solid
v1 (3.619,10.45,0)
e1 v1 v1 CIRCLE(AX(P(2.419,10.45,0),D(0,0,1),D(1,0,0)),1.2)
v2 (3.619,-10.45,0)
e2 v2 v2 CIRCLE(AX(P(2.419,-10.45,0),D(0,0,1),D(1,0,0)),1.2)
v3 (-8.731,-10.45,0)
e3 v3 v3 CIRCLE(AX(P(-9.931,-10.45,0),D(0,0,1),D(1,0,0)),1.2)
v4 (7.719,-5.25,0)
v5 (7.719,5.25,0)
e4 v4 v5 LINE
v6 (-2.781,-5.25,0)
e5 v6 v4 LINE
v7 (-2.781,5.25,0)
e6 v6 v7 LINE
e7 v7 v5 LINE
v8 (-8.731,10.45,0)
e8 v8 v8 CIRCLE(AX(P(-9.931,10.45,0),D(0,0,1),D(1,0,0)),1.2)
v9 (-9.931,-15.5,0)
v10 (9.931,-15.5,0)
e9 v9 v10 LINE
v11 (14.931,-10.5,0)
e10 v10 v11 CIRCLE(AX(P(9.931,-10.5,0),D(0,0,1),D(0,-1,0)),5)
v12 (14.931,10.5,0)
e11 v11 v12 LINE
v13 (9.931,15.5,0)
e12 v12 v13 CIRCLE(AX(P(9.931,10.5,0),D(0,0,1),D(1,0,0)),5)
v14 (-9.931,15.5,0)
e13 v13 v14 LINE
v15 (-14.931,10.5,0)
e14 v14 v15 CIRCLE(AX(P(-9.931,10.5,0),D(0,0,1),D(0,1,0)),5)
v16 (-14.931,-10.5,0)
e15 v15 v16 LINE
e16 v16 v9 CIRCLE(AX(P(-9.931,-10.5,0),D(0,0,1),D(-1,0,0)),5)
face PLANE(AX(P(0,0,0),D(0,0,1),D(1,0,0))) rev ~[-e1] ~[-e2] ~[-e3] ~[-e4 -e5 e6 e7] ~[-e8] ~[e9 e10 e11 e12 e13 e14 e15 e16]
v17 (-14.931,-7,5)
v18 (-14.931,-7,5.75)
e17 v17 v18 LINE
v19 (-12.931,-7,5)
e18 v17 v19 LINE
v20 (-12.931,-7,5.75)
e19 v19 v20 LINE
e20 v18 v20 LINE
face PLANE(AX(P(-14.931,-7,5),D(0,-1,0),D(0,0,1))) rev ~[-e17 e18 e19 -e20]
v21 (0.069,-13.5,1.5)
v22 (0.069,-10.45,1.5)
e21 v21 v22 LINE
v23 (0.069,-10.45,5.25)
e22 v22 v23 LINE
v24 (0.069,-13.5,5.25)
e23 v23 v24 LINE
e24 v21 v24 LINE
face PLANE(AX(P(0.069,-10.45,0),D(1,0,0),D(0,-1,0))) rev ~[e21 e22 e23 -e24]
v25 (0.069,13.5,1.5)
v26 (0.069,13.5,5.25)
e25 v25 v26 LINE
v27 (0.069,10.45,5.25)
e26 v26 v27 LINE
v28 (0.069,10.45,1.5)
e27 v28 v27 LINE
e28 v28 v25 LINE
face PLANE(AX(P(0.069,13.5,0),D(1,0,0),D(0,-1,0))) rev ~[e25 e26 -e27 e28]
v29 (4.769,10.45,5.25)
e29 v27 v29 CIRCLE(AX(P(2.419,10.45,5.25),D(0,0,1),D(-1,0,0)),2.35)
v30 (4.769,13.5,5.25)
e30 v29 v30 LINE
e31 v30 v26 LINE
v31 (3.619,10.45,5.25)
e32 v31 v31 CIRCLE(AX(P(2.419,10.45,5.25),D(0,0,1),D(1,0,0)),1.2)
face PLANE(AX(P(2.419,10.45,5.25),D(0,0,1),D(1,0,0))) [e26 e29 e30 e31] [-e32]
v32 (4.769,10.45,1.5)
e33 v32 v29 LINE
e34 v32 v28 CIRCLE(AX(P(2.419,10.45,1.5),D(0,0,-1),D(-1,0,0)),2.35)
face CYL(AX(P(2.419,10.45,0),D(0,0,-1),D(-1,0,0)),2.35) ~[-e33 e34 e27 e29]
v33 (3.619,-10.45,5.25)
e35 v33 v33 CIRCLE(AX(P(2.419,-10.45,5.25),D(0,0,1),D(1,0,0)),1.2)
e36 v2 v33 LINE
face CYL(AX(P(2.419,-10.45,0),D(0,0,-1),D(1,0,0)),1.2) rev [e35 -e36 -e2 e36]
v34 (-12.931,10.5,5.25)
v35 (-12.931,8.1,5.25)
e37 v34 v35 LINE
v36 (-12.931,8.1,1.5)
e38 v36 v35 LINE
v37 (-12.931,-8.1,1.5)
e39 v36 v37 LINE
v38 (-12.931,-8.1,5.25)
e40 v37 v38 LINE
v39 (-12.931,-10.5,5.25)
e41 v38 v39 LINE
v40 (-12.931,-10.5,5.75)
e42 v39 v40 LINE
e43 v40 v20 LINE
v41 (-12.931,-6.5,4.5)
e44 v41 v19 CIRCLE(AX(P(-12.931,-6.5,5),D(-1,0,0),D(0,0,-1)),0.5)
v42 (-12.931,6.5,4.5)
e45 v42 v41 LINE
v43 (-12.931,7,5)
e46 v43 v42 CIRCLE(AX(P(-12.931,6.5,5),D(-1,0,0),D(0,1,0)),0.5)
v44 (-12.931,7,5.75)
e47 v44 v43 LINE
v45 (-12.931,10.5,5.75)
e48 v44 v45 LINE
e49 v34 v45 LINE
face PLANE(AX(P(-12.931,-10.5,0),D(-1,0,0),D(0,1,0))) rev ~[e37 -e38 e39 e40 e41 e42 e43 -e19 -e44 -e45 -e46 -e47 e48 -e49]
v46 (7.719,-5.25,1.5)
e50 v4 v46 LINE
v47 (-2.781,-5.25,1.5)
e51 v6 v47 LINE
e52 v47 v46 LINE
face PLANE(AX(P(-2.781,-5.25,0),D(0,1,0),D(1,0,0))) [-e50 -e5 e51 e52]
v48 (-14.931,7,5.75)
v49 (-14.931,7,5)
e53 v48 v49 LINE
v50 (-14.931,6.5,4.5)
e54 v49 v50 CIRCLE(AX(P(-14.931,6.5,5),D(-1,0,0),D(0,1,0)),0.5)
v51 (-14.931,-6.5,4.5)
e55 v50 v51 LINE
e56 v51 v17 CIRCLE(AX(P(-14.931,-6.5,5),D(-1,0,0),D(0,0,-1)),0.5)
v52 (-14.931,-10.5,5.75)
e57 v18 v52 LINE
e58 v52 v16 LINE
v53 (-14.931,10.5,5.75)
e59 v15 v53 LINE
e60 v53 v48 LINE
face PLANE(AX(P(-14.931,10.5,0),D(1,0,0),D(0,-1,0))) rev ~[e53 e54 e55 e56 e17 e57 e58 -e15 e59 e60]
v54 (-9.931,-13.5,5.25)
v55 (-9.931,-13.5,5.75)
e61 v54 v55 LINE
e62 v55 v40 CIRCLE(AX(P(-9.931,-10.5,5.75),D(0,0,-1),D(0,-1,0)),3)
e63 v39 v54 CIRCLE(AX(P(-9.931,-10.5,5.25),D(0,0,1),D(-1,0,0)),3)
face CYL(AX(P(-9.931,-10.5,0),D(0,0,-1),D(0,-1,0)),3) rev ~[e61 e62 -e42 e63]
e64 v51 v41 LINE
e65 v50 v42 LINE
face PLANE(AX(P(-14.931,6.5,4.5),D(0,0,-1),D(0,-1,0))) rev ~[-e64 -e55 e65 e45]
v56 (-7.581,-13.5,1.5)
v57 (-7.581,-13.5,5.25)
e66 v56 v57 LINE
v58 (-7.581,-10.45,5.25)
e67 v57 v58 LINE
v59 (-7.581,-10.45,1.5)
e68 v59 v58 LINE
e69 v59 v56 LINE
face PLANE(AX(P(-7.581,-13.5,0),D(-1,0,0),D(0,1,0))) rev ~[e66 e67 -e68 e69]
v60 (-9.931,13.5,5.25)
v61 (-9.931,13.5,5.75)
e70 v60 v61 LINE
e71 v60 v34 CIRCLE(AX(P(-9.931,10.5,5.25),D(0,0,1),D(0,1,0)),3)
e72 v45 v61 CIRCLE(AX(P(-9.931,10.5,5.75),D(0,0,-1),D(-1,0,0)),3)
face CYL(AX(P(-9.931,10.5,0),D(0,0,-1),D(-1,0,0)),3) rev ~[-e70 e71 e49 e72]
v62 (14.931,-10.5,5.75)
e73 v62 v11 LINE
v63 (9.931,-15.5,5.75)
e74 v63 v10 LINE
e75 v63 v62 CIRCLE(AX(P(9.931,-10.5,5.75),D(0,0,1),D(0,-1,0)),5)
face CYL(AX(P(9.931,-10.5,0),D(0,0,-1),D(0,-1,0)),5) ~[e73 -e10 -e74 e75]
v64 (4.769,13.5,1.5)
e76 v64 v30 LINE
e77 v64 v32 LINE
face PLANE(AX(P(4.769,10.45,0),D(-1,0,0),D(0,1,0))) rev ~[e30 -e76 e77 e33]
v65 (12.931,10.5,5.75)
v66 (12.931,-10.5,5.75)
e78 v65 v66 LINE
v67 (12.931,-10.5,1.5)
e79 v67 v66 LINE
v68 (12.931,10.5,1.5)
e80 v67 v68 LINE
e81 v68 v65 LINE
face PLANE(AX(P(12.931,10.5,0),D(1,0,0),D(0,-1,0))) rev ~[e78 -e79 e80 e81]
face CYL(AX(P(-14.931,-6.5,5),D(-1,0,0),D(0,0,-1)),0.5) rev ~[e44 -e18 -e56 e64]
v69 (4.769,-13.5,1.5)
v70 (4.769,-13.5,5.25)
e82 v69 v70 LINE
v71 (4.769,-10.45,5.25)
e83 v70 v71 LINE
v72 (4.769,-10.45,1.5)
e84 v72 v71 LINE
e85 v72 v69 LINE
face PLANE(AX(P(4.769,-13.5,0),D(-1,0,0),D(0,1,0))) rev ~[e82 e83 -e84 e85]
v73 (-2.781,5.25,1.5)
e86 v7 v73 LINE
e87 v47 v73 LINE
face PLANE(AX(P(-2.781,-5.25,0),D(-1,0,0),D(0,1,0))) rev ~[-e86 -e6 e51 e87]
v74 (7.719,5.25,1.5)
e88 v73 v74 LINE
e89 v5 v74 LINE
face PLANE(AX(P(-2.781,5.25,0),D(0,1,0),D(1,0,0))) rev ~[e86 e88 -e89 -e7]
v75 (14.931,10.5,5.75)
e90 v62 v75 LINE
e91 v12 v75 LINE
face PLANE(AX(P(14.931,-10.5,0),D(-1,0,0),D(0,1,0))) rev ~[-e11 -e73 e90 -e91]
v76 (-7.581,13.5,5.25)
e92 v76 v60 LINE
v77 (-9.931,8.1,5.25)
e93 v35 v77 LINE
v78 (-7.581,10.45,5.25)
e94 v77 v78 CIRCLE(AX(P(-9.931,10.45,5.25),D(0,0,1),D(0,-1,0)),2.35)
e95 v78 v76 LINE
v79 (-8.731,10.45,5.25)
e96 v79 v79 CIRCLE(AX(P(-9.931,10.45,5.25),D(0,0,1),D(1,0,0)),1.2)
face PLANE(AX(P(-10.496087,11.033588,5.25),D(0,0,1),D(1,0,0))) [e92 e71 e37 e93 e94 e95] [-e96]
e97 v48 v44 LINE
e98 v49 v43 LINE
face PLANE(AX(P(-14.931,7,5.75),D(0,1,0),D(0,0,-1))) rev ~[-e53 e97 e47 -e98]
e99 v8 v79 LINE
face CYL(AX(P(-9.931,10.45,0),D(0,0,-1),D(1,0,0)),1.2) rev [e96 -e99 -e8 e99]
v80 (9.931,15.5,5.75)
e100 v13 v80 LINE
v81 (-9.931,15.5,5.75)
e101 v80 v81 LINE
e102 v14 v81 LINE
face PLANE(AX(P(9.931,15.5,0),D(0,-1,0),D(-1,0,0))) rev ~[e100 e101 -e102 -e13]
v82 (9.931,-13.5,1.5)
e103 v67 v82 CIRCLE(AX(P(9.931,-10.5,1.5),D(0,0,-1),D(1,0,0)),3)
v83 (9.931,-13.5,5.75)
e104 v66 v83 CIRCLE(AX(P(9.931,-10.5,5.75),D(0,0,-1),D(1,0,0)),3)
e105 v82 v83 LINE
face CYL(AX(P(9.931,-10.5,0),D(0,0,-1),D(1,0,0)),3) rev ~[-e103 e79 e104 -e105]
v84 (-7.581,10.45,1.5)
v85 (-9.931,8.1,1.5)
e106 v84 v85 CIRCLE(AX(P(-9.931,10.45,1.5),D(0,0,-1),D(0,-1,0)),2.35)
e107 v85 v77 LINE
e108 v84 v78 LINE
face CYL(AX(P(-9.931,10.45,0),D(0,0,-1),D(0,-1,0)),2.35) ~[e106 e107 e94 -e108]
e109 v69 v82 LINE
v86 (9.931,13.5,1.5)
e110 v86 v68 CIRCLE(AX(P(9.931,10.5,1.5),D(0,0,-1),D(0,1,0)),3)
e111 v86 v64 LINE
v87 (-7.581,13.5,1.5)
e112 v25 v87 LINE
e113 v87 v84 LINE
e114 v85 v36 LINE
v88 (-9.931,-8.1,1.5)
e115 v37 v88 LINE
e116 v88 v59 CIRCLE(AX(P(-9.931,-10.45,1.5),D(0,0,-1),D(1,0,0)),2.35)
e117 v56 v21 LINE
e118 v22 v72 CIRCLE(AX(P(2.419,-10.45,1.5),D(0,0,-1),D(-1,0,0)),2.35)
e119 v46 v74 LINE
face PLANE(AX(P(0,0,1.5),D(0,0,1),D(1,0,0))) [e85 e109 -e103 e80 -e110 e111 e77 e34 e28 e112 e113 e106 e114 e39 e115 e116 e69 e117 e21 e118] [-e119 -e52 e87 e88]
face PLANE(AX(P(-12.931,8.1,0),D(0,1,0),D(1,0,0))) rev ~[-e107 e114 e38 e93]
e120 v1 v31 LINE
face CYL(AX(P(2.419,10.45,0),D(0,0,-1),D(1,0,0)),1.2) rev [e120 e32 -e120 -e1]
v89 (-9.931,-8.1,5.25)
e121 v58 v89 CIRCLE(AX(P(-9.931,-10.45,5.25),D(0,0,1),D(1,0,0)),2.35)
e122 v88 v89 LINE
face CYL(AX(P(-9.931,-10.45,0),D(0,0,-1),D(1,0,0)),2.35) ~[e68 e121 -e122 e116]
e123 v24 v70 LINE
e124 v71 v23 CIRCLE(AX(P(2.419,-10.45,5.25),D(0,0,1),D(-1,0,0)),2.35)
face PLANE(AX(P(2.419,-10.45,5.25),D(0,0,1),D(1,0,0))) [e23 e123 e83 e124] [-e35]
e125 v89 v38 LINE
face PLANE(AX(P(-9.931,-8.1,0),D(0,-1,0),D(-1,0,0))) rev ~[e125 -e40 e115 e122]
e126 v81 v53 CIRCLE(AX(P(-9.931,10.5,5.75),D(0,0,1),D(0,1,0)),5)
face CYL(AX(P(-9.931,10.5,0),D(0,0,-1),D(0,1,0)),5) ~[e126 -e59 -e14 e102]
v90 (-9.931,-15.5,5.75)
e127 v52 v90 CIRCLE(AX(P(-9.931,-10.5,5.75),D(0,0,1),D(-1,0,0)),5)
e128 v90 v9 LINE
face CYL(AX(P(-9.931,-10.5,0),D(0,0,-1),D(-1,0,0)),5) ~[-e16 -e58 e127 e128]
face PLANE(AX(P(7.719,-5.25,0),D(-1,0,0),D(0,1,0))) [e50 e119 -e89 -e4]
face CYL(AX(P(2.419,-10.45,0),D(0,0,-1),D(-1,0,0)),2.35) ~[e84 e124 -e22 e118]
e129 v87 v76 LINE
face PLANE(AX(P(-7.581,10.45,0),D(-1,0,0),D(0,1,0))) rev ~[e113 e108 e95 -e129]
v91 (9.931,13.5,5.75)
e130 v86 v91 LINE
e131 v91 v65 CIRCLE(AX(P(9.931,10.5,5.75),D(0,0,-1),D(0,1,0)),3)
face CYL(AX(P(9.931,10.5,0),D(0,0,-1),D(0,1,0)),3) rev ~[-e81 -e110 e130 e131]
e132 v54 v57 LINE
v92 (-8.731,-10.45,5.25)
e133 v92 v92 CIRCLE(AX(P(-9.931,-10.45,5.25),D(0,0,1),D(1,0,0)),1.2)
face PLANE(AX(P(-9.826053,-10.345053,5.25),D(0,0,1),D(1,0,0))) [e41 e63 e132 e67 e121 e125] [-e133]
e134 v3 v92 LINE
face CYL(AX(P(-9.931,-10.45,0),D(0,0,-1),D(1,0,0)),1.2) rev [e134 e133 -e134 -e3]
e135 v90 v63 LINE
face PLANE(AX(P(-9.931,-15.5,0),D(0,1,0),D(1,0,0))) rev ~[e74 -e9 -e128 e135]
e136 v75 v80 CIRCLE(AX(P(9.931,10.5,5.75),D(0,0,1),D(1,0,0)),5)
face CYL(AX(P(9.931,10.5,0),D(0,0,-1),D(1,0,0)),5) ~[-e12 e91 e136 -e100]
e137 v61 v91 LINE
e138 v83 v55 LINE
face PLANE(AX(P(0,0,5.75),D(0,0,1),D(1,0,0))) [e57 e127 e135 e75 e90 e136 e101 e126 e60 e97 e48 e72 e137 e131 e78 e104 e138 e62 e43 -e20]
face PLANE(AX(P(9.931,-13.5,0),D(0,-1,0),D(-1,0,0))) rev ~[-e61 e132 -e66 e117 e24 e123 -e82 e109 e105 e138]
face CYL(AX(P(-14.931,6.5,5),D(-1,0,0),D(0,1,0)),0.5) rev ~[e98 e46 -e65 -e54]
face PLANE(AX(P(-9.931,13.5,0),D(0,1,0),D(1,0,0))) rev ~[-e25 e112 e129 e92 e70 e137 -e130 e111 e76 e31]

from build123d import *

# Parameters (mm, degrees)
F0_R     = 1.2
F0_W     = 10.5
F0_H     = 10.5
F1_DEPTH = 1.5
F2_DEPTH = 5.25
F3_DEPTH = 5.75
F5_DEPTH = 2


# Not quite as in the source:
# - a feature names something its author has since deleted; it is built from what else it names


with BuildPart() as f1:
    # F0 (on Top) → F1 (new body)
    with BuildSketch(Plane.XY):
        with BuildLine():
            Line((14.9310000289, -10.5), (14.9310000289, 10.5))
            ThreePointArc((14.9310000289, 10.5), (13.4665339264, 14.0355339264), (9.931, 15.5000000289))
            Line((9.931, 15.5000000289), (-9.931, 15.5000000289))
            ThreePointArc((-9.931, 15.5000000289), (-13.4665339264, 14.0355339264), (-14.9310000289, 10.5))
            Line((-14.9310000289, 10.5), (-14.9310000289, -10.5))
            ThreePointArc((-14.9310000289, -10.5), (-13.4665339264, -14.0355339264), (-9.931, -15.5000000289))
            Line((-9.931, -15.5000000289), (9.931, -15.5000000289))
            ThreePointArc((9.931, -15.5000000289), (13.4665339264, -14.0355339264), (14.9310000289, -10.5))
        make_face()
        with BuildLine():
            Line((-9.931, 13.5000000289), (-7.581, 13.5000000289))
            Line((-7.581, 13.5000000289), (0.069, 13.5000000289))
            Line((0.069, 13.5000000289), (4.769, 13.5000000289))
            Line((4.769, 13.5000000289), (9.931, 13.5000000289))
            ThreePointArc((9.931, 13.5000000289), (12.052320364, 12.621320364), (12.9310000289, 10.5))
            Line((12.9310000289, 10.5), (12.9310000289, -10.5))
            ThreePointArc((12.9310000289, -10.5), (12.052320364, -12.621320364), (9.931, -13.5000000289))
            Line((9.931, -13.5000000289), (4.769, -13.5000000289))
            Line((4.769, -13.5000000289), (0.069, -13.5000000289))
            Line((0.069, -13.5000000289), (-7.581, -13.5000000289))
            Line((-7.581, -13.5000000289), (-9.931, -13.5000000289))
            ThreePointArc((-9.931, -13.5000000289), (-12.052320364, -12.621320364), (-12.9310000289, -10.5))
            Line((-12.9310000289, -10.5), (-12.9310000289, -8.1))
            Line((-12.9310000289, -8.1), (-12.9310000289, 8.1))
            Line((-12.9310000289, 8.1), (-12.9310000289, 10.5))
            ThreePointArc((-12.9310000289, 10.5), (-12.052320364, 12.621320364), (-9.931, 13.5000000289))
        make_face(mode=Mode.SUBTRACT)
        with BuildLine():
            ThreePointArc((4.769, -10.45), (2.419, -8.1), (0.069, -10.45))
            ThreePointArc((0.069, -10.45), (2.419, -12.8), (4.769, -10.45))
        make_face()
        with Locations((2.419, -10.45)):
            Circle(F0_R, mode=Mode.SUBTRACT)
        with BuildLine():
            ThreePointArc((4.769, 10.45), (2.419, 12.8), (0.069, 10.45))
            ThreePointArc((0.069, 10.45), (2.419, 8.1), (4.769, 10.45))
        make_face()
        with Locations((2.419, 10.45)):
            Circle(F0_R, mode=Mode.SUBTRACT)
        with BuildLine():
            ThreePointArc((-9.931, 8.1), (-11.5927009358, 12.1117009358), (-7.581, 10.45))
            Line((-7.581, 10.45), (-7.581, 13.5000000289))
            Line((-7.581, 13.5000000289), (-9.931, 13.5000000289))
            ThreePointArc((-9.931, 13.5000000289), (-12.052320364, 12.621320364), (-12.9310000289, 10.5))
            Line((-12.9310000289, 10.5), (-12.9310000289, 8.1))
            Line((-12.9310000289, 8.1), (-9.931, 8.1))
        make_face()
        with BuildLine():
            Line((-9.931, -8.1), (-12.9310000289, -8.1))
            Line((-12.9310000289, -8.1), (-12.9310000289, -10.5))
            ThreePointArc((-12.9310000289, -10.5), (-12.052320364, -12.621320364), (-9.931, -13.5000000289))
            Line((-9.931, -13.5000000289), (-7.581, -13.5000000289))
            Line((-7.581, -13.5000000289), (-7.581, -10.45))
            ThreePointArc((-7.581, -10.45), (-11.5927009358, -12.1117009358), (-9.931, -8.1))
        make_face()
        with BuildLine():
            Line((-7.581, 13.5000000289), (-7.581, 10.45))
            ThreePointArc((-7.581, 10.45), (-8.2692990642, 8.7882990642), (-9.931, 8.1))
            Line((-9.931, 8.1), (-12.9310000289, 8.1))
            Line((-12.9310000289, 8.1), (-12.9310000289, -8.1))
            Line((-12.9310000289, -8.1), (-9.931, -8.1))
            ThreePointArc((-9.931, -8.1), (-8.2692990642, -8.7882990642), (-7.581, -10.45))
            Line((-7.581, -10.45), (-7.581, -13.5000000289))
            Line((-7.581, -13.5000000289), (0.069, -13.5000000289))
            Line((0.069, -13.5000000289), (0.069, -10.45))
            ThreePointArc((0.069, -10.45), (2.419, -8.1), (4.769, -10.45))
            Line((4.769, -10.45), (4.769, -13.5000000289))
            Line((4.769, -13.5000000289), (9.931, -13.5000000289))
            ThreePointArc((9.931, -13.5000000289), (12.052320364, -12.621320364), (12.9310000289, -10.5))
            Line((12.9310000289, -10.5), (12.9310000289, 10.5))
            ThreePointArc((12.9310000289, 10.5), (12.052320364, 12.621320364), (9.931, 13.5000000289))
            Line((9.931, 13.5000000289), (4.769, 13.5000000289))
            Line((4.769, 13.5000000289), (4.769, 10.45))
            ThreePointArc((4.769, 10.45), (2.419, 8.1), (0.069, 10.45))
            Line((0.069, 10.45), (0.069, 13.5000000289))
            Line((0.069, 13.5000000289), (-7.581, 13.5000000289))
        make_face()
        with Locations((2.469, 0)):
            Rectangle(F0_W, F0_H, mode=Mode.SUBTRACT)
        with BuildLine():
            ThreePointArc((-7.581, -10.45), (-8.2692990642, -8.7882990642), (-9.931, -8.1))
            ThreePointArc((-9.931, -8.1), (-11.5927009358, -12.1117009358), (-7.581, -10.45))
        make_face()
        with Locations((-9.931, -10.45)):
            Circle(F0_R, mode=Mode.SUBTRACT)
        with BuildLine():
            Line((0.069, -10.45), (0.069, -13.5000000289))
            Line((0.069, -13.5000000289), (4.769, -13.5000000289))
            Line((4.769, -13.5000000289), (4.769, -10.45))
            ThreePointArc((4.769, -10.45), (2.419, -12.8), (0.069, -10.45))
        make_face()
        with BuildLine():
            ThreePointArc((-9.931, 8.1), (-8.2692990642, 8.7882990642), (-7.581, 10.45))
            ThreePointArc((-7.581, 10.45), (-11.5927009358, 12.1117009358), (-9.931, 8.1))
        make_face()
        with Locations((-9.931, 10.45)):
            Circle(F0_R, mode=Mode.SUBTRACT)
        with BuildLine():
            Line((4.769, 13.5000000289), (0.069, 13.5000000289))
            Line((0.069, 13.5000000289), (0.069, 10.45))
            ThreePointArc((0.069, 10.45), (2.419, 12.8), (4.769, 10.45))
            Line((4.769, 10.45), (4.769, 13.5000000289))
        make_face()
    extrude(amount=F1_DEPTH)

    # F0 (on Top) → F2 (join)
    with BuildSketch(Plane.XY):
        with BuildLine():
            ThreePointArc((-9.931, 8.1), (-11.5927009358, 12.1117009358), (-7.581, 10.45))
            Line((-7.581, 10.45), (-7.581, 13.5000000289))
            Line((-7.581, 13.5000000289), (-9.931, 13.5000000289))
            ThreePointArc((-9.931, 13.5000000289), (-12.052320364, 12.621320364), (-12.9310000289, 10.5))
            Line((-12.9310000289, 10.5), (-12.9310000289, 8.1))
            Line((-12.9310000289, 8.1), (-9.931, 8.1))
        make_face()
        with BuildLine():
            ThreePointArc((-9.931, 8.1), (-8.2692990642, 8.7882990642), (-7.581, 10.45))
            ThreePointArc((-7.581, 10.45), (-11.5927009358, 12.1117009358), (-9.931, 8.1))
        make_face()
        with Locations((-9.931, 10.45)):
            Circle(F0_R, mode=Mode.SUBTRACT)
        with BuildLine():
            ThreePointArc((4.769, 10.45), (2.419, 12.8), (0.069, 10.45))
            ThreePointArc((0.069, 10.45), (2.419, 8.1), (4.769, 10.45))
        make_face()
        with Locations((2.419, 10.45)):
            Circle(F0_R, mode=Mode.SUBTRACT)
        with BuildLine():
            Line((4.769, 13.5000000289), (0.069, 13.5000000289))
            Line((0.069, 13.5000000289), (0.069, 10.45))
            ThreePointArc((0.069, 10.45), (2.419, 12.8), (4.769, 10.45))
            Line((4.769, 10.45), (4.769, 13.5000000289))
        make_face()
        with BuildLine():
            ThreePointArc((4.769, -10.45), (2.419, -8.1), (0.069, -10.45))
            ThreePointArc((0.069, -10.45), (2.419, -12.8), (4.769, -10.45))
        make_face()
        with Locations((2.419, -10.45)):
            Circle(F0_R, mode=Mode.SUBTRACT)
        with BuildLine():
            Line((0.069, -10.45), (0.069, -13.5000000289))
            Line((0.069, -13.5000000289), (4.769, -13.5000000289))
            Line((4.769, -13.5000000289), (4.769, -10.45))
            ThreePointArc((4.769, -10.45), (2.419, -12.8), (0.069, -10.45))
        make_face()
        with BuildLine():
            ThreePointArc((-7.581, -10.45), (-8.2692990642, -8.7882990642), (-9.931, -8.1))
            ThreePointArc((-9.931, -8.1), (-11.5927009358, -12.1117009358), (-7.581, -10.45))
        make_face()
        with Locations((-9.931, -10.45)):
            Circle(F0_R, mode=Mode.SUBTRACT)
        with BuildLine():
            Line((-9.931, -8.1), (-12.9310000289, -8.1))
            Line((-12.9310000289, -8.1), (-12.9310000289, -10.5))
            ThreePointArc((-12.9310000289, -10.5), (-12.052320364, -12.621320364), (-9.931, -13.5000000289))
            Line((-9.931, -13.5000000289), (-7.581, -13.5000000289))
            Line((-7.581, -13.5000000289), (-7.581, -10.45))
            ThreePointArc((-7.581, -10.45), (-11.5927009358, -12.1117009358), (-9.931, -8.1))
        make_face()
    extrude(amount=F2_DEPTH)

    # F0 (on Top) → F3 (join)
    with BuildSketch(Plane.XY):
        with BuildLine():
            Line((14.9310000289, -10.5), (14.9310000289, 10.5))
            ThreePointArc((14.9310000289, 10.5), (13.4665339264, 14.0355339264), (9.931, 15.5000000289))
            Line((9.931, 15.5000000289), (-9.931, 15.5000000289))
            ThreePointArc((-9.931, 15.5000000289), (-13.4665339264, 14.0355339264), (-14.9310000289, 10.5))
            Line((-14.9310000289, 10.5), (-14.9310000289, -10.5))
            ThreePointArc((-14.9310000289, -10.5), (-13.4665339264, -14.0355339264), (-9.931, -15.5000000289))
            Line((-9.931, -15.5000000289), (9.931, -15.5000000289))
            ThreePointArc((9.931, -15.5000000289), (13.4665339264, -14.0355339264), (14.9310000289, -10.5))
        make_face()
        with BuildLine():
            Line((-9.931, 13.5000000289), (-7.581, 13.5000000289))
            Line((-7.581, 13.5000000289), (0.069, 13.5000000289))
            Line((0.069, 13.5000000289), (4.769, 13.5000000289))
            Line((4.769, 13.5000000289), (9.931, 13.5000000289))
            ThreePointArc((9.931, 13.5000000289), (12.052320364, 12.621320364), (12.9310000289, 10.5))
            Line((12.9310000289, 10.5), (12.9310000289, -10.5))
            ThreePointArc((12.9310000289, -10.5), (12.052320364, -12.621320364), (9.931, -13.5000000289))
            Line((9.931, -13.5000000289), (4.769, -13.5000000289))
            Line((4.769, -13.5000000289), (0.069, -13.5000000289))
            Line((0.069, -13.5000000289), (-7.581, -13.5000000289))
            Line((-7.581, -13.5000000289), (-9.931, -13.5000000289))
            ThreePointArc((-9.931, -13.5000000289), (-12.052320364, -12.621320364), (-12.9310000289, -10.5))
            Line((-12.9310000289, -10.5), (-12.9310000289, -8.1))
            Line((-12.9310000289, -8.1), (-12.9310000289, 8.1))
            Line((-12.9310000289, 8.1), (-12.9310000289, 10.5))
            ThreePointArc((-12.9310000289, 10.5), (-12.052320364, 12.621320364), (-9.931, 13.5000000289))
        make_face(mode=Mode.SUBTRACT)
    extrude(amount=F3_DEPTH)

    # F4 (on face) → F5 (cut)
    with BuildSketch(Plane(origin=(-14.9310000289, 0, 0), x_dir=(0, -1, 0), z_dir=(-1, 0, 0))):
        with BuildLine():
            Line((7, 5.75), (-7, 5.75))
            Line((-7, 5.75), (-7, 5))
            ThreePointArc((-7, 5), (-6.8535533906, 4.6464466094), (-6.5, 4.5))
            Line((-6.5, 4.5), (6.5, 4.5))
            ThreePointArc((6.5, 4.5), (6.8535533906, 4.6464466094), (7, 5))
            Line((7, 5), (7, 5.75))
        make_face()
    extrude(amount=-F5_DEPTH, mode=Mode.SUBTRACT)


solid = f1.part
